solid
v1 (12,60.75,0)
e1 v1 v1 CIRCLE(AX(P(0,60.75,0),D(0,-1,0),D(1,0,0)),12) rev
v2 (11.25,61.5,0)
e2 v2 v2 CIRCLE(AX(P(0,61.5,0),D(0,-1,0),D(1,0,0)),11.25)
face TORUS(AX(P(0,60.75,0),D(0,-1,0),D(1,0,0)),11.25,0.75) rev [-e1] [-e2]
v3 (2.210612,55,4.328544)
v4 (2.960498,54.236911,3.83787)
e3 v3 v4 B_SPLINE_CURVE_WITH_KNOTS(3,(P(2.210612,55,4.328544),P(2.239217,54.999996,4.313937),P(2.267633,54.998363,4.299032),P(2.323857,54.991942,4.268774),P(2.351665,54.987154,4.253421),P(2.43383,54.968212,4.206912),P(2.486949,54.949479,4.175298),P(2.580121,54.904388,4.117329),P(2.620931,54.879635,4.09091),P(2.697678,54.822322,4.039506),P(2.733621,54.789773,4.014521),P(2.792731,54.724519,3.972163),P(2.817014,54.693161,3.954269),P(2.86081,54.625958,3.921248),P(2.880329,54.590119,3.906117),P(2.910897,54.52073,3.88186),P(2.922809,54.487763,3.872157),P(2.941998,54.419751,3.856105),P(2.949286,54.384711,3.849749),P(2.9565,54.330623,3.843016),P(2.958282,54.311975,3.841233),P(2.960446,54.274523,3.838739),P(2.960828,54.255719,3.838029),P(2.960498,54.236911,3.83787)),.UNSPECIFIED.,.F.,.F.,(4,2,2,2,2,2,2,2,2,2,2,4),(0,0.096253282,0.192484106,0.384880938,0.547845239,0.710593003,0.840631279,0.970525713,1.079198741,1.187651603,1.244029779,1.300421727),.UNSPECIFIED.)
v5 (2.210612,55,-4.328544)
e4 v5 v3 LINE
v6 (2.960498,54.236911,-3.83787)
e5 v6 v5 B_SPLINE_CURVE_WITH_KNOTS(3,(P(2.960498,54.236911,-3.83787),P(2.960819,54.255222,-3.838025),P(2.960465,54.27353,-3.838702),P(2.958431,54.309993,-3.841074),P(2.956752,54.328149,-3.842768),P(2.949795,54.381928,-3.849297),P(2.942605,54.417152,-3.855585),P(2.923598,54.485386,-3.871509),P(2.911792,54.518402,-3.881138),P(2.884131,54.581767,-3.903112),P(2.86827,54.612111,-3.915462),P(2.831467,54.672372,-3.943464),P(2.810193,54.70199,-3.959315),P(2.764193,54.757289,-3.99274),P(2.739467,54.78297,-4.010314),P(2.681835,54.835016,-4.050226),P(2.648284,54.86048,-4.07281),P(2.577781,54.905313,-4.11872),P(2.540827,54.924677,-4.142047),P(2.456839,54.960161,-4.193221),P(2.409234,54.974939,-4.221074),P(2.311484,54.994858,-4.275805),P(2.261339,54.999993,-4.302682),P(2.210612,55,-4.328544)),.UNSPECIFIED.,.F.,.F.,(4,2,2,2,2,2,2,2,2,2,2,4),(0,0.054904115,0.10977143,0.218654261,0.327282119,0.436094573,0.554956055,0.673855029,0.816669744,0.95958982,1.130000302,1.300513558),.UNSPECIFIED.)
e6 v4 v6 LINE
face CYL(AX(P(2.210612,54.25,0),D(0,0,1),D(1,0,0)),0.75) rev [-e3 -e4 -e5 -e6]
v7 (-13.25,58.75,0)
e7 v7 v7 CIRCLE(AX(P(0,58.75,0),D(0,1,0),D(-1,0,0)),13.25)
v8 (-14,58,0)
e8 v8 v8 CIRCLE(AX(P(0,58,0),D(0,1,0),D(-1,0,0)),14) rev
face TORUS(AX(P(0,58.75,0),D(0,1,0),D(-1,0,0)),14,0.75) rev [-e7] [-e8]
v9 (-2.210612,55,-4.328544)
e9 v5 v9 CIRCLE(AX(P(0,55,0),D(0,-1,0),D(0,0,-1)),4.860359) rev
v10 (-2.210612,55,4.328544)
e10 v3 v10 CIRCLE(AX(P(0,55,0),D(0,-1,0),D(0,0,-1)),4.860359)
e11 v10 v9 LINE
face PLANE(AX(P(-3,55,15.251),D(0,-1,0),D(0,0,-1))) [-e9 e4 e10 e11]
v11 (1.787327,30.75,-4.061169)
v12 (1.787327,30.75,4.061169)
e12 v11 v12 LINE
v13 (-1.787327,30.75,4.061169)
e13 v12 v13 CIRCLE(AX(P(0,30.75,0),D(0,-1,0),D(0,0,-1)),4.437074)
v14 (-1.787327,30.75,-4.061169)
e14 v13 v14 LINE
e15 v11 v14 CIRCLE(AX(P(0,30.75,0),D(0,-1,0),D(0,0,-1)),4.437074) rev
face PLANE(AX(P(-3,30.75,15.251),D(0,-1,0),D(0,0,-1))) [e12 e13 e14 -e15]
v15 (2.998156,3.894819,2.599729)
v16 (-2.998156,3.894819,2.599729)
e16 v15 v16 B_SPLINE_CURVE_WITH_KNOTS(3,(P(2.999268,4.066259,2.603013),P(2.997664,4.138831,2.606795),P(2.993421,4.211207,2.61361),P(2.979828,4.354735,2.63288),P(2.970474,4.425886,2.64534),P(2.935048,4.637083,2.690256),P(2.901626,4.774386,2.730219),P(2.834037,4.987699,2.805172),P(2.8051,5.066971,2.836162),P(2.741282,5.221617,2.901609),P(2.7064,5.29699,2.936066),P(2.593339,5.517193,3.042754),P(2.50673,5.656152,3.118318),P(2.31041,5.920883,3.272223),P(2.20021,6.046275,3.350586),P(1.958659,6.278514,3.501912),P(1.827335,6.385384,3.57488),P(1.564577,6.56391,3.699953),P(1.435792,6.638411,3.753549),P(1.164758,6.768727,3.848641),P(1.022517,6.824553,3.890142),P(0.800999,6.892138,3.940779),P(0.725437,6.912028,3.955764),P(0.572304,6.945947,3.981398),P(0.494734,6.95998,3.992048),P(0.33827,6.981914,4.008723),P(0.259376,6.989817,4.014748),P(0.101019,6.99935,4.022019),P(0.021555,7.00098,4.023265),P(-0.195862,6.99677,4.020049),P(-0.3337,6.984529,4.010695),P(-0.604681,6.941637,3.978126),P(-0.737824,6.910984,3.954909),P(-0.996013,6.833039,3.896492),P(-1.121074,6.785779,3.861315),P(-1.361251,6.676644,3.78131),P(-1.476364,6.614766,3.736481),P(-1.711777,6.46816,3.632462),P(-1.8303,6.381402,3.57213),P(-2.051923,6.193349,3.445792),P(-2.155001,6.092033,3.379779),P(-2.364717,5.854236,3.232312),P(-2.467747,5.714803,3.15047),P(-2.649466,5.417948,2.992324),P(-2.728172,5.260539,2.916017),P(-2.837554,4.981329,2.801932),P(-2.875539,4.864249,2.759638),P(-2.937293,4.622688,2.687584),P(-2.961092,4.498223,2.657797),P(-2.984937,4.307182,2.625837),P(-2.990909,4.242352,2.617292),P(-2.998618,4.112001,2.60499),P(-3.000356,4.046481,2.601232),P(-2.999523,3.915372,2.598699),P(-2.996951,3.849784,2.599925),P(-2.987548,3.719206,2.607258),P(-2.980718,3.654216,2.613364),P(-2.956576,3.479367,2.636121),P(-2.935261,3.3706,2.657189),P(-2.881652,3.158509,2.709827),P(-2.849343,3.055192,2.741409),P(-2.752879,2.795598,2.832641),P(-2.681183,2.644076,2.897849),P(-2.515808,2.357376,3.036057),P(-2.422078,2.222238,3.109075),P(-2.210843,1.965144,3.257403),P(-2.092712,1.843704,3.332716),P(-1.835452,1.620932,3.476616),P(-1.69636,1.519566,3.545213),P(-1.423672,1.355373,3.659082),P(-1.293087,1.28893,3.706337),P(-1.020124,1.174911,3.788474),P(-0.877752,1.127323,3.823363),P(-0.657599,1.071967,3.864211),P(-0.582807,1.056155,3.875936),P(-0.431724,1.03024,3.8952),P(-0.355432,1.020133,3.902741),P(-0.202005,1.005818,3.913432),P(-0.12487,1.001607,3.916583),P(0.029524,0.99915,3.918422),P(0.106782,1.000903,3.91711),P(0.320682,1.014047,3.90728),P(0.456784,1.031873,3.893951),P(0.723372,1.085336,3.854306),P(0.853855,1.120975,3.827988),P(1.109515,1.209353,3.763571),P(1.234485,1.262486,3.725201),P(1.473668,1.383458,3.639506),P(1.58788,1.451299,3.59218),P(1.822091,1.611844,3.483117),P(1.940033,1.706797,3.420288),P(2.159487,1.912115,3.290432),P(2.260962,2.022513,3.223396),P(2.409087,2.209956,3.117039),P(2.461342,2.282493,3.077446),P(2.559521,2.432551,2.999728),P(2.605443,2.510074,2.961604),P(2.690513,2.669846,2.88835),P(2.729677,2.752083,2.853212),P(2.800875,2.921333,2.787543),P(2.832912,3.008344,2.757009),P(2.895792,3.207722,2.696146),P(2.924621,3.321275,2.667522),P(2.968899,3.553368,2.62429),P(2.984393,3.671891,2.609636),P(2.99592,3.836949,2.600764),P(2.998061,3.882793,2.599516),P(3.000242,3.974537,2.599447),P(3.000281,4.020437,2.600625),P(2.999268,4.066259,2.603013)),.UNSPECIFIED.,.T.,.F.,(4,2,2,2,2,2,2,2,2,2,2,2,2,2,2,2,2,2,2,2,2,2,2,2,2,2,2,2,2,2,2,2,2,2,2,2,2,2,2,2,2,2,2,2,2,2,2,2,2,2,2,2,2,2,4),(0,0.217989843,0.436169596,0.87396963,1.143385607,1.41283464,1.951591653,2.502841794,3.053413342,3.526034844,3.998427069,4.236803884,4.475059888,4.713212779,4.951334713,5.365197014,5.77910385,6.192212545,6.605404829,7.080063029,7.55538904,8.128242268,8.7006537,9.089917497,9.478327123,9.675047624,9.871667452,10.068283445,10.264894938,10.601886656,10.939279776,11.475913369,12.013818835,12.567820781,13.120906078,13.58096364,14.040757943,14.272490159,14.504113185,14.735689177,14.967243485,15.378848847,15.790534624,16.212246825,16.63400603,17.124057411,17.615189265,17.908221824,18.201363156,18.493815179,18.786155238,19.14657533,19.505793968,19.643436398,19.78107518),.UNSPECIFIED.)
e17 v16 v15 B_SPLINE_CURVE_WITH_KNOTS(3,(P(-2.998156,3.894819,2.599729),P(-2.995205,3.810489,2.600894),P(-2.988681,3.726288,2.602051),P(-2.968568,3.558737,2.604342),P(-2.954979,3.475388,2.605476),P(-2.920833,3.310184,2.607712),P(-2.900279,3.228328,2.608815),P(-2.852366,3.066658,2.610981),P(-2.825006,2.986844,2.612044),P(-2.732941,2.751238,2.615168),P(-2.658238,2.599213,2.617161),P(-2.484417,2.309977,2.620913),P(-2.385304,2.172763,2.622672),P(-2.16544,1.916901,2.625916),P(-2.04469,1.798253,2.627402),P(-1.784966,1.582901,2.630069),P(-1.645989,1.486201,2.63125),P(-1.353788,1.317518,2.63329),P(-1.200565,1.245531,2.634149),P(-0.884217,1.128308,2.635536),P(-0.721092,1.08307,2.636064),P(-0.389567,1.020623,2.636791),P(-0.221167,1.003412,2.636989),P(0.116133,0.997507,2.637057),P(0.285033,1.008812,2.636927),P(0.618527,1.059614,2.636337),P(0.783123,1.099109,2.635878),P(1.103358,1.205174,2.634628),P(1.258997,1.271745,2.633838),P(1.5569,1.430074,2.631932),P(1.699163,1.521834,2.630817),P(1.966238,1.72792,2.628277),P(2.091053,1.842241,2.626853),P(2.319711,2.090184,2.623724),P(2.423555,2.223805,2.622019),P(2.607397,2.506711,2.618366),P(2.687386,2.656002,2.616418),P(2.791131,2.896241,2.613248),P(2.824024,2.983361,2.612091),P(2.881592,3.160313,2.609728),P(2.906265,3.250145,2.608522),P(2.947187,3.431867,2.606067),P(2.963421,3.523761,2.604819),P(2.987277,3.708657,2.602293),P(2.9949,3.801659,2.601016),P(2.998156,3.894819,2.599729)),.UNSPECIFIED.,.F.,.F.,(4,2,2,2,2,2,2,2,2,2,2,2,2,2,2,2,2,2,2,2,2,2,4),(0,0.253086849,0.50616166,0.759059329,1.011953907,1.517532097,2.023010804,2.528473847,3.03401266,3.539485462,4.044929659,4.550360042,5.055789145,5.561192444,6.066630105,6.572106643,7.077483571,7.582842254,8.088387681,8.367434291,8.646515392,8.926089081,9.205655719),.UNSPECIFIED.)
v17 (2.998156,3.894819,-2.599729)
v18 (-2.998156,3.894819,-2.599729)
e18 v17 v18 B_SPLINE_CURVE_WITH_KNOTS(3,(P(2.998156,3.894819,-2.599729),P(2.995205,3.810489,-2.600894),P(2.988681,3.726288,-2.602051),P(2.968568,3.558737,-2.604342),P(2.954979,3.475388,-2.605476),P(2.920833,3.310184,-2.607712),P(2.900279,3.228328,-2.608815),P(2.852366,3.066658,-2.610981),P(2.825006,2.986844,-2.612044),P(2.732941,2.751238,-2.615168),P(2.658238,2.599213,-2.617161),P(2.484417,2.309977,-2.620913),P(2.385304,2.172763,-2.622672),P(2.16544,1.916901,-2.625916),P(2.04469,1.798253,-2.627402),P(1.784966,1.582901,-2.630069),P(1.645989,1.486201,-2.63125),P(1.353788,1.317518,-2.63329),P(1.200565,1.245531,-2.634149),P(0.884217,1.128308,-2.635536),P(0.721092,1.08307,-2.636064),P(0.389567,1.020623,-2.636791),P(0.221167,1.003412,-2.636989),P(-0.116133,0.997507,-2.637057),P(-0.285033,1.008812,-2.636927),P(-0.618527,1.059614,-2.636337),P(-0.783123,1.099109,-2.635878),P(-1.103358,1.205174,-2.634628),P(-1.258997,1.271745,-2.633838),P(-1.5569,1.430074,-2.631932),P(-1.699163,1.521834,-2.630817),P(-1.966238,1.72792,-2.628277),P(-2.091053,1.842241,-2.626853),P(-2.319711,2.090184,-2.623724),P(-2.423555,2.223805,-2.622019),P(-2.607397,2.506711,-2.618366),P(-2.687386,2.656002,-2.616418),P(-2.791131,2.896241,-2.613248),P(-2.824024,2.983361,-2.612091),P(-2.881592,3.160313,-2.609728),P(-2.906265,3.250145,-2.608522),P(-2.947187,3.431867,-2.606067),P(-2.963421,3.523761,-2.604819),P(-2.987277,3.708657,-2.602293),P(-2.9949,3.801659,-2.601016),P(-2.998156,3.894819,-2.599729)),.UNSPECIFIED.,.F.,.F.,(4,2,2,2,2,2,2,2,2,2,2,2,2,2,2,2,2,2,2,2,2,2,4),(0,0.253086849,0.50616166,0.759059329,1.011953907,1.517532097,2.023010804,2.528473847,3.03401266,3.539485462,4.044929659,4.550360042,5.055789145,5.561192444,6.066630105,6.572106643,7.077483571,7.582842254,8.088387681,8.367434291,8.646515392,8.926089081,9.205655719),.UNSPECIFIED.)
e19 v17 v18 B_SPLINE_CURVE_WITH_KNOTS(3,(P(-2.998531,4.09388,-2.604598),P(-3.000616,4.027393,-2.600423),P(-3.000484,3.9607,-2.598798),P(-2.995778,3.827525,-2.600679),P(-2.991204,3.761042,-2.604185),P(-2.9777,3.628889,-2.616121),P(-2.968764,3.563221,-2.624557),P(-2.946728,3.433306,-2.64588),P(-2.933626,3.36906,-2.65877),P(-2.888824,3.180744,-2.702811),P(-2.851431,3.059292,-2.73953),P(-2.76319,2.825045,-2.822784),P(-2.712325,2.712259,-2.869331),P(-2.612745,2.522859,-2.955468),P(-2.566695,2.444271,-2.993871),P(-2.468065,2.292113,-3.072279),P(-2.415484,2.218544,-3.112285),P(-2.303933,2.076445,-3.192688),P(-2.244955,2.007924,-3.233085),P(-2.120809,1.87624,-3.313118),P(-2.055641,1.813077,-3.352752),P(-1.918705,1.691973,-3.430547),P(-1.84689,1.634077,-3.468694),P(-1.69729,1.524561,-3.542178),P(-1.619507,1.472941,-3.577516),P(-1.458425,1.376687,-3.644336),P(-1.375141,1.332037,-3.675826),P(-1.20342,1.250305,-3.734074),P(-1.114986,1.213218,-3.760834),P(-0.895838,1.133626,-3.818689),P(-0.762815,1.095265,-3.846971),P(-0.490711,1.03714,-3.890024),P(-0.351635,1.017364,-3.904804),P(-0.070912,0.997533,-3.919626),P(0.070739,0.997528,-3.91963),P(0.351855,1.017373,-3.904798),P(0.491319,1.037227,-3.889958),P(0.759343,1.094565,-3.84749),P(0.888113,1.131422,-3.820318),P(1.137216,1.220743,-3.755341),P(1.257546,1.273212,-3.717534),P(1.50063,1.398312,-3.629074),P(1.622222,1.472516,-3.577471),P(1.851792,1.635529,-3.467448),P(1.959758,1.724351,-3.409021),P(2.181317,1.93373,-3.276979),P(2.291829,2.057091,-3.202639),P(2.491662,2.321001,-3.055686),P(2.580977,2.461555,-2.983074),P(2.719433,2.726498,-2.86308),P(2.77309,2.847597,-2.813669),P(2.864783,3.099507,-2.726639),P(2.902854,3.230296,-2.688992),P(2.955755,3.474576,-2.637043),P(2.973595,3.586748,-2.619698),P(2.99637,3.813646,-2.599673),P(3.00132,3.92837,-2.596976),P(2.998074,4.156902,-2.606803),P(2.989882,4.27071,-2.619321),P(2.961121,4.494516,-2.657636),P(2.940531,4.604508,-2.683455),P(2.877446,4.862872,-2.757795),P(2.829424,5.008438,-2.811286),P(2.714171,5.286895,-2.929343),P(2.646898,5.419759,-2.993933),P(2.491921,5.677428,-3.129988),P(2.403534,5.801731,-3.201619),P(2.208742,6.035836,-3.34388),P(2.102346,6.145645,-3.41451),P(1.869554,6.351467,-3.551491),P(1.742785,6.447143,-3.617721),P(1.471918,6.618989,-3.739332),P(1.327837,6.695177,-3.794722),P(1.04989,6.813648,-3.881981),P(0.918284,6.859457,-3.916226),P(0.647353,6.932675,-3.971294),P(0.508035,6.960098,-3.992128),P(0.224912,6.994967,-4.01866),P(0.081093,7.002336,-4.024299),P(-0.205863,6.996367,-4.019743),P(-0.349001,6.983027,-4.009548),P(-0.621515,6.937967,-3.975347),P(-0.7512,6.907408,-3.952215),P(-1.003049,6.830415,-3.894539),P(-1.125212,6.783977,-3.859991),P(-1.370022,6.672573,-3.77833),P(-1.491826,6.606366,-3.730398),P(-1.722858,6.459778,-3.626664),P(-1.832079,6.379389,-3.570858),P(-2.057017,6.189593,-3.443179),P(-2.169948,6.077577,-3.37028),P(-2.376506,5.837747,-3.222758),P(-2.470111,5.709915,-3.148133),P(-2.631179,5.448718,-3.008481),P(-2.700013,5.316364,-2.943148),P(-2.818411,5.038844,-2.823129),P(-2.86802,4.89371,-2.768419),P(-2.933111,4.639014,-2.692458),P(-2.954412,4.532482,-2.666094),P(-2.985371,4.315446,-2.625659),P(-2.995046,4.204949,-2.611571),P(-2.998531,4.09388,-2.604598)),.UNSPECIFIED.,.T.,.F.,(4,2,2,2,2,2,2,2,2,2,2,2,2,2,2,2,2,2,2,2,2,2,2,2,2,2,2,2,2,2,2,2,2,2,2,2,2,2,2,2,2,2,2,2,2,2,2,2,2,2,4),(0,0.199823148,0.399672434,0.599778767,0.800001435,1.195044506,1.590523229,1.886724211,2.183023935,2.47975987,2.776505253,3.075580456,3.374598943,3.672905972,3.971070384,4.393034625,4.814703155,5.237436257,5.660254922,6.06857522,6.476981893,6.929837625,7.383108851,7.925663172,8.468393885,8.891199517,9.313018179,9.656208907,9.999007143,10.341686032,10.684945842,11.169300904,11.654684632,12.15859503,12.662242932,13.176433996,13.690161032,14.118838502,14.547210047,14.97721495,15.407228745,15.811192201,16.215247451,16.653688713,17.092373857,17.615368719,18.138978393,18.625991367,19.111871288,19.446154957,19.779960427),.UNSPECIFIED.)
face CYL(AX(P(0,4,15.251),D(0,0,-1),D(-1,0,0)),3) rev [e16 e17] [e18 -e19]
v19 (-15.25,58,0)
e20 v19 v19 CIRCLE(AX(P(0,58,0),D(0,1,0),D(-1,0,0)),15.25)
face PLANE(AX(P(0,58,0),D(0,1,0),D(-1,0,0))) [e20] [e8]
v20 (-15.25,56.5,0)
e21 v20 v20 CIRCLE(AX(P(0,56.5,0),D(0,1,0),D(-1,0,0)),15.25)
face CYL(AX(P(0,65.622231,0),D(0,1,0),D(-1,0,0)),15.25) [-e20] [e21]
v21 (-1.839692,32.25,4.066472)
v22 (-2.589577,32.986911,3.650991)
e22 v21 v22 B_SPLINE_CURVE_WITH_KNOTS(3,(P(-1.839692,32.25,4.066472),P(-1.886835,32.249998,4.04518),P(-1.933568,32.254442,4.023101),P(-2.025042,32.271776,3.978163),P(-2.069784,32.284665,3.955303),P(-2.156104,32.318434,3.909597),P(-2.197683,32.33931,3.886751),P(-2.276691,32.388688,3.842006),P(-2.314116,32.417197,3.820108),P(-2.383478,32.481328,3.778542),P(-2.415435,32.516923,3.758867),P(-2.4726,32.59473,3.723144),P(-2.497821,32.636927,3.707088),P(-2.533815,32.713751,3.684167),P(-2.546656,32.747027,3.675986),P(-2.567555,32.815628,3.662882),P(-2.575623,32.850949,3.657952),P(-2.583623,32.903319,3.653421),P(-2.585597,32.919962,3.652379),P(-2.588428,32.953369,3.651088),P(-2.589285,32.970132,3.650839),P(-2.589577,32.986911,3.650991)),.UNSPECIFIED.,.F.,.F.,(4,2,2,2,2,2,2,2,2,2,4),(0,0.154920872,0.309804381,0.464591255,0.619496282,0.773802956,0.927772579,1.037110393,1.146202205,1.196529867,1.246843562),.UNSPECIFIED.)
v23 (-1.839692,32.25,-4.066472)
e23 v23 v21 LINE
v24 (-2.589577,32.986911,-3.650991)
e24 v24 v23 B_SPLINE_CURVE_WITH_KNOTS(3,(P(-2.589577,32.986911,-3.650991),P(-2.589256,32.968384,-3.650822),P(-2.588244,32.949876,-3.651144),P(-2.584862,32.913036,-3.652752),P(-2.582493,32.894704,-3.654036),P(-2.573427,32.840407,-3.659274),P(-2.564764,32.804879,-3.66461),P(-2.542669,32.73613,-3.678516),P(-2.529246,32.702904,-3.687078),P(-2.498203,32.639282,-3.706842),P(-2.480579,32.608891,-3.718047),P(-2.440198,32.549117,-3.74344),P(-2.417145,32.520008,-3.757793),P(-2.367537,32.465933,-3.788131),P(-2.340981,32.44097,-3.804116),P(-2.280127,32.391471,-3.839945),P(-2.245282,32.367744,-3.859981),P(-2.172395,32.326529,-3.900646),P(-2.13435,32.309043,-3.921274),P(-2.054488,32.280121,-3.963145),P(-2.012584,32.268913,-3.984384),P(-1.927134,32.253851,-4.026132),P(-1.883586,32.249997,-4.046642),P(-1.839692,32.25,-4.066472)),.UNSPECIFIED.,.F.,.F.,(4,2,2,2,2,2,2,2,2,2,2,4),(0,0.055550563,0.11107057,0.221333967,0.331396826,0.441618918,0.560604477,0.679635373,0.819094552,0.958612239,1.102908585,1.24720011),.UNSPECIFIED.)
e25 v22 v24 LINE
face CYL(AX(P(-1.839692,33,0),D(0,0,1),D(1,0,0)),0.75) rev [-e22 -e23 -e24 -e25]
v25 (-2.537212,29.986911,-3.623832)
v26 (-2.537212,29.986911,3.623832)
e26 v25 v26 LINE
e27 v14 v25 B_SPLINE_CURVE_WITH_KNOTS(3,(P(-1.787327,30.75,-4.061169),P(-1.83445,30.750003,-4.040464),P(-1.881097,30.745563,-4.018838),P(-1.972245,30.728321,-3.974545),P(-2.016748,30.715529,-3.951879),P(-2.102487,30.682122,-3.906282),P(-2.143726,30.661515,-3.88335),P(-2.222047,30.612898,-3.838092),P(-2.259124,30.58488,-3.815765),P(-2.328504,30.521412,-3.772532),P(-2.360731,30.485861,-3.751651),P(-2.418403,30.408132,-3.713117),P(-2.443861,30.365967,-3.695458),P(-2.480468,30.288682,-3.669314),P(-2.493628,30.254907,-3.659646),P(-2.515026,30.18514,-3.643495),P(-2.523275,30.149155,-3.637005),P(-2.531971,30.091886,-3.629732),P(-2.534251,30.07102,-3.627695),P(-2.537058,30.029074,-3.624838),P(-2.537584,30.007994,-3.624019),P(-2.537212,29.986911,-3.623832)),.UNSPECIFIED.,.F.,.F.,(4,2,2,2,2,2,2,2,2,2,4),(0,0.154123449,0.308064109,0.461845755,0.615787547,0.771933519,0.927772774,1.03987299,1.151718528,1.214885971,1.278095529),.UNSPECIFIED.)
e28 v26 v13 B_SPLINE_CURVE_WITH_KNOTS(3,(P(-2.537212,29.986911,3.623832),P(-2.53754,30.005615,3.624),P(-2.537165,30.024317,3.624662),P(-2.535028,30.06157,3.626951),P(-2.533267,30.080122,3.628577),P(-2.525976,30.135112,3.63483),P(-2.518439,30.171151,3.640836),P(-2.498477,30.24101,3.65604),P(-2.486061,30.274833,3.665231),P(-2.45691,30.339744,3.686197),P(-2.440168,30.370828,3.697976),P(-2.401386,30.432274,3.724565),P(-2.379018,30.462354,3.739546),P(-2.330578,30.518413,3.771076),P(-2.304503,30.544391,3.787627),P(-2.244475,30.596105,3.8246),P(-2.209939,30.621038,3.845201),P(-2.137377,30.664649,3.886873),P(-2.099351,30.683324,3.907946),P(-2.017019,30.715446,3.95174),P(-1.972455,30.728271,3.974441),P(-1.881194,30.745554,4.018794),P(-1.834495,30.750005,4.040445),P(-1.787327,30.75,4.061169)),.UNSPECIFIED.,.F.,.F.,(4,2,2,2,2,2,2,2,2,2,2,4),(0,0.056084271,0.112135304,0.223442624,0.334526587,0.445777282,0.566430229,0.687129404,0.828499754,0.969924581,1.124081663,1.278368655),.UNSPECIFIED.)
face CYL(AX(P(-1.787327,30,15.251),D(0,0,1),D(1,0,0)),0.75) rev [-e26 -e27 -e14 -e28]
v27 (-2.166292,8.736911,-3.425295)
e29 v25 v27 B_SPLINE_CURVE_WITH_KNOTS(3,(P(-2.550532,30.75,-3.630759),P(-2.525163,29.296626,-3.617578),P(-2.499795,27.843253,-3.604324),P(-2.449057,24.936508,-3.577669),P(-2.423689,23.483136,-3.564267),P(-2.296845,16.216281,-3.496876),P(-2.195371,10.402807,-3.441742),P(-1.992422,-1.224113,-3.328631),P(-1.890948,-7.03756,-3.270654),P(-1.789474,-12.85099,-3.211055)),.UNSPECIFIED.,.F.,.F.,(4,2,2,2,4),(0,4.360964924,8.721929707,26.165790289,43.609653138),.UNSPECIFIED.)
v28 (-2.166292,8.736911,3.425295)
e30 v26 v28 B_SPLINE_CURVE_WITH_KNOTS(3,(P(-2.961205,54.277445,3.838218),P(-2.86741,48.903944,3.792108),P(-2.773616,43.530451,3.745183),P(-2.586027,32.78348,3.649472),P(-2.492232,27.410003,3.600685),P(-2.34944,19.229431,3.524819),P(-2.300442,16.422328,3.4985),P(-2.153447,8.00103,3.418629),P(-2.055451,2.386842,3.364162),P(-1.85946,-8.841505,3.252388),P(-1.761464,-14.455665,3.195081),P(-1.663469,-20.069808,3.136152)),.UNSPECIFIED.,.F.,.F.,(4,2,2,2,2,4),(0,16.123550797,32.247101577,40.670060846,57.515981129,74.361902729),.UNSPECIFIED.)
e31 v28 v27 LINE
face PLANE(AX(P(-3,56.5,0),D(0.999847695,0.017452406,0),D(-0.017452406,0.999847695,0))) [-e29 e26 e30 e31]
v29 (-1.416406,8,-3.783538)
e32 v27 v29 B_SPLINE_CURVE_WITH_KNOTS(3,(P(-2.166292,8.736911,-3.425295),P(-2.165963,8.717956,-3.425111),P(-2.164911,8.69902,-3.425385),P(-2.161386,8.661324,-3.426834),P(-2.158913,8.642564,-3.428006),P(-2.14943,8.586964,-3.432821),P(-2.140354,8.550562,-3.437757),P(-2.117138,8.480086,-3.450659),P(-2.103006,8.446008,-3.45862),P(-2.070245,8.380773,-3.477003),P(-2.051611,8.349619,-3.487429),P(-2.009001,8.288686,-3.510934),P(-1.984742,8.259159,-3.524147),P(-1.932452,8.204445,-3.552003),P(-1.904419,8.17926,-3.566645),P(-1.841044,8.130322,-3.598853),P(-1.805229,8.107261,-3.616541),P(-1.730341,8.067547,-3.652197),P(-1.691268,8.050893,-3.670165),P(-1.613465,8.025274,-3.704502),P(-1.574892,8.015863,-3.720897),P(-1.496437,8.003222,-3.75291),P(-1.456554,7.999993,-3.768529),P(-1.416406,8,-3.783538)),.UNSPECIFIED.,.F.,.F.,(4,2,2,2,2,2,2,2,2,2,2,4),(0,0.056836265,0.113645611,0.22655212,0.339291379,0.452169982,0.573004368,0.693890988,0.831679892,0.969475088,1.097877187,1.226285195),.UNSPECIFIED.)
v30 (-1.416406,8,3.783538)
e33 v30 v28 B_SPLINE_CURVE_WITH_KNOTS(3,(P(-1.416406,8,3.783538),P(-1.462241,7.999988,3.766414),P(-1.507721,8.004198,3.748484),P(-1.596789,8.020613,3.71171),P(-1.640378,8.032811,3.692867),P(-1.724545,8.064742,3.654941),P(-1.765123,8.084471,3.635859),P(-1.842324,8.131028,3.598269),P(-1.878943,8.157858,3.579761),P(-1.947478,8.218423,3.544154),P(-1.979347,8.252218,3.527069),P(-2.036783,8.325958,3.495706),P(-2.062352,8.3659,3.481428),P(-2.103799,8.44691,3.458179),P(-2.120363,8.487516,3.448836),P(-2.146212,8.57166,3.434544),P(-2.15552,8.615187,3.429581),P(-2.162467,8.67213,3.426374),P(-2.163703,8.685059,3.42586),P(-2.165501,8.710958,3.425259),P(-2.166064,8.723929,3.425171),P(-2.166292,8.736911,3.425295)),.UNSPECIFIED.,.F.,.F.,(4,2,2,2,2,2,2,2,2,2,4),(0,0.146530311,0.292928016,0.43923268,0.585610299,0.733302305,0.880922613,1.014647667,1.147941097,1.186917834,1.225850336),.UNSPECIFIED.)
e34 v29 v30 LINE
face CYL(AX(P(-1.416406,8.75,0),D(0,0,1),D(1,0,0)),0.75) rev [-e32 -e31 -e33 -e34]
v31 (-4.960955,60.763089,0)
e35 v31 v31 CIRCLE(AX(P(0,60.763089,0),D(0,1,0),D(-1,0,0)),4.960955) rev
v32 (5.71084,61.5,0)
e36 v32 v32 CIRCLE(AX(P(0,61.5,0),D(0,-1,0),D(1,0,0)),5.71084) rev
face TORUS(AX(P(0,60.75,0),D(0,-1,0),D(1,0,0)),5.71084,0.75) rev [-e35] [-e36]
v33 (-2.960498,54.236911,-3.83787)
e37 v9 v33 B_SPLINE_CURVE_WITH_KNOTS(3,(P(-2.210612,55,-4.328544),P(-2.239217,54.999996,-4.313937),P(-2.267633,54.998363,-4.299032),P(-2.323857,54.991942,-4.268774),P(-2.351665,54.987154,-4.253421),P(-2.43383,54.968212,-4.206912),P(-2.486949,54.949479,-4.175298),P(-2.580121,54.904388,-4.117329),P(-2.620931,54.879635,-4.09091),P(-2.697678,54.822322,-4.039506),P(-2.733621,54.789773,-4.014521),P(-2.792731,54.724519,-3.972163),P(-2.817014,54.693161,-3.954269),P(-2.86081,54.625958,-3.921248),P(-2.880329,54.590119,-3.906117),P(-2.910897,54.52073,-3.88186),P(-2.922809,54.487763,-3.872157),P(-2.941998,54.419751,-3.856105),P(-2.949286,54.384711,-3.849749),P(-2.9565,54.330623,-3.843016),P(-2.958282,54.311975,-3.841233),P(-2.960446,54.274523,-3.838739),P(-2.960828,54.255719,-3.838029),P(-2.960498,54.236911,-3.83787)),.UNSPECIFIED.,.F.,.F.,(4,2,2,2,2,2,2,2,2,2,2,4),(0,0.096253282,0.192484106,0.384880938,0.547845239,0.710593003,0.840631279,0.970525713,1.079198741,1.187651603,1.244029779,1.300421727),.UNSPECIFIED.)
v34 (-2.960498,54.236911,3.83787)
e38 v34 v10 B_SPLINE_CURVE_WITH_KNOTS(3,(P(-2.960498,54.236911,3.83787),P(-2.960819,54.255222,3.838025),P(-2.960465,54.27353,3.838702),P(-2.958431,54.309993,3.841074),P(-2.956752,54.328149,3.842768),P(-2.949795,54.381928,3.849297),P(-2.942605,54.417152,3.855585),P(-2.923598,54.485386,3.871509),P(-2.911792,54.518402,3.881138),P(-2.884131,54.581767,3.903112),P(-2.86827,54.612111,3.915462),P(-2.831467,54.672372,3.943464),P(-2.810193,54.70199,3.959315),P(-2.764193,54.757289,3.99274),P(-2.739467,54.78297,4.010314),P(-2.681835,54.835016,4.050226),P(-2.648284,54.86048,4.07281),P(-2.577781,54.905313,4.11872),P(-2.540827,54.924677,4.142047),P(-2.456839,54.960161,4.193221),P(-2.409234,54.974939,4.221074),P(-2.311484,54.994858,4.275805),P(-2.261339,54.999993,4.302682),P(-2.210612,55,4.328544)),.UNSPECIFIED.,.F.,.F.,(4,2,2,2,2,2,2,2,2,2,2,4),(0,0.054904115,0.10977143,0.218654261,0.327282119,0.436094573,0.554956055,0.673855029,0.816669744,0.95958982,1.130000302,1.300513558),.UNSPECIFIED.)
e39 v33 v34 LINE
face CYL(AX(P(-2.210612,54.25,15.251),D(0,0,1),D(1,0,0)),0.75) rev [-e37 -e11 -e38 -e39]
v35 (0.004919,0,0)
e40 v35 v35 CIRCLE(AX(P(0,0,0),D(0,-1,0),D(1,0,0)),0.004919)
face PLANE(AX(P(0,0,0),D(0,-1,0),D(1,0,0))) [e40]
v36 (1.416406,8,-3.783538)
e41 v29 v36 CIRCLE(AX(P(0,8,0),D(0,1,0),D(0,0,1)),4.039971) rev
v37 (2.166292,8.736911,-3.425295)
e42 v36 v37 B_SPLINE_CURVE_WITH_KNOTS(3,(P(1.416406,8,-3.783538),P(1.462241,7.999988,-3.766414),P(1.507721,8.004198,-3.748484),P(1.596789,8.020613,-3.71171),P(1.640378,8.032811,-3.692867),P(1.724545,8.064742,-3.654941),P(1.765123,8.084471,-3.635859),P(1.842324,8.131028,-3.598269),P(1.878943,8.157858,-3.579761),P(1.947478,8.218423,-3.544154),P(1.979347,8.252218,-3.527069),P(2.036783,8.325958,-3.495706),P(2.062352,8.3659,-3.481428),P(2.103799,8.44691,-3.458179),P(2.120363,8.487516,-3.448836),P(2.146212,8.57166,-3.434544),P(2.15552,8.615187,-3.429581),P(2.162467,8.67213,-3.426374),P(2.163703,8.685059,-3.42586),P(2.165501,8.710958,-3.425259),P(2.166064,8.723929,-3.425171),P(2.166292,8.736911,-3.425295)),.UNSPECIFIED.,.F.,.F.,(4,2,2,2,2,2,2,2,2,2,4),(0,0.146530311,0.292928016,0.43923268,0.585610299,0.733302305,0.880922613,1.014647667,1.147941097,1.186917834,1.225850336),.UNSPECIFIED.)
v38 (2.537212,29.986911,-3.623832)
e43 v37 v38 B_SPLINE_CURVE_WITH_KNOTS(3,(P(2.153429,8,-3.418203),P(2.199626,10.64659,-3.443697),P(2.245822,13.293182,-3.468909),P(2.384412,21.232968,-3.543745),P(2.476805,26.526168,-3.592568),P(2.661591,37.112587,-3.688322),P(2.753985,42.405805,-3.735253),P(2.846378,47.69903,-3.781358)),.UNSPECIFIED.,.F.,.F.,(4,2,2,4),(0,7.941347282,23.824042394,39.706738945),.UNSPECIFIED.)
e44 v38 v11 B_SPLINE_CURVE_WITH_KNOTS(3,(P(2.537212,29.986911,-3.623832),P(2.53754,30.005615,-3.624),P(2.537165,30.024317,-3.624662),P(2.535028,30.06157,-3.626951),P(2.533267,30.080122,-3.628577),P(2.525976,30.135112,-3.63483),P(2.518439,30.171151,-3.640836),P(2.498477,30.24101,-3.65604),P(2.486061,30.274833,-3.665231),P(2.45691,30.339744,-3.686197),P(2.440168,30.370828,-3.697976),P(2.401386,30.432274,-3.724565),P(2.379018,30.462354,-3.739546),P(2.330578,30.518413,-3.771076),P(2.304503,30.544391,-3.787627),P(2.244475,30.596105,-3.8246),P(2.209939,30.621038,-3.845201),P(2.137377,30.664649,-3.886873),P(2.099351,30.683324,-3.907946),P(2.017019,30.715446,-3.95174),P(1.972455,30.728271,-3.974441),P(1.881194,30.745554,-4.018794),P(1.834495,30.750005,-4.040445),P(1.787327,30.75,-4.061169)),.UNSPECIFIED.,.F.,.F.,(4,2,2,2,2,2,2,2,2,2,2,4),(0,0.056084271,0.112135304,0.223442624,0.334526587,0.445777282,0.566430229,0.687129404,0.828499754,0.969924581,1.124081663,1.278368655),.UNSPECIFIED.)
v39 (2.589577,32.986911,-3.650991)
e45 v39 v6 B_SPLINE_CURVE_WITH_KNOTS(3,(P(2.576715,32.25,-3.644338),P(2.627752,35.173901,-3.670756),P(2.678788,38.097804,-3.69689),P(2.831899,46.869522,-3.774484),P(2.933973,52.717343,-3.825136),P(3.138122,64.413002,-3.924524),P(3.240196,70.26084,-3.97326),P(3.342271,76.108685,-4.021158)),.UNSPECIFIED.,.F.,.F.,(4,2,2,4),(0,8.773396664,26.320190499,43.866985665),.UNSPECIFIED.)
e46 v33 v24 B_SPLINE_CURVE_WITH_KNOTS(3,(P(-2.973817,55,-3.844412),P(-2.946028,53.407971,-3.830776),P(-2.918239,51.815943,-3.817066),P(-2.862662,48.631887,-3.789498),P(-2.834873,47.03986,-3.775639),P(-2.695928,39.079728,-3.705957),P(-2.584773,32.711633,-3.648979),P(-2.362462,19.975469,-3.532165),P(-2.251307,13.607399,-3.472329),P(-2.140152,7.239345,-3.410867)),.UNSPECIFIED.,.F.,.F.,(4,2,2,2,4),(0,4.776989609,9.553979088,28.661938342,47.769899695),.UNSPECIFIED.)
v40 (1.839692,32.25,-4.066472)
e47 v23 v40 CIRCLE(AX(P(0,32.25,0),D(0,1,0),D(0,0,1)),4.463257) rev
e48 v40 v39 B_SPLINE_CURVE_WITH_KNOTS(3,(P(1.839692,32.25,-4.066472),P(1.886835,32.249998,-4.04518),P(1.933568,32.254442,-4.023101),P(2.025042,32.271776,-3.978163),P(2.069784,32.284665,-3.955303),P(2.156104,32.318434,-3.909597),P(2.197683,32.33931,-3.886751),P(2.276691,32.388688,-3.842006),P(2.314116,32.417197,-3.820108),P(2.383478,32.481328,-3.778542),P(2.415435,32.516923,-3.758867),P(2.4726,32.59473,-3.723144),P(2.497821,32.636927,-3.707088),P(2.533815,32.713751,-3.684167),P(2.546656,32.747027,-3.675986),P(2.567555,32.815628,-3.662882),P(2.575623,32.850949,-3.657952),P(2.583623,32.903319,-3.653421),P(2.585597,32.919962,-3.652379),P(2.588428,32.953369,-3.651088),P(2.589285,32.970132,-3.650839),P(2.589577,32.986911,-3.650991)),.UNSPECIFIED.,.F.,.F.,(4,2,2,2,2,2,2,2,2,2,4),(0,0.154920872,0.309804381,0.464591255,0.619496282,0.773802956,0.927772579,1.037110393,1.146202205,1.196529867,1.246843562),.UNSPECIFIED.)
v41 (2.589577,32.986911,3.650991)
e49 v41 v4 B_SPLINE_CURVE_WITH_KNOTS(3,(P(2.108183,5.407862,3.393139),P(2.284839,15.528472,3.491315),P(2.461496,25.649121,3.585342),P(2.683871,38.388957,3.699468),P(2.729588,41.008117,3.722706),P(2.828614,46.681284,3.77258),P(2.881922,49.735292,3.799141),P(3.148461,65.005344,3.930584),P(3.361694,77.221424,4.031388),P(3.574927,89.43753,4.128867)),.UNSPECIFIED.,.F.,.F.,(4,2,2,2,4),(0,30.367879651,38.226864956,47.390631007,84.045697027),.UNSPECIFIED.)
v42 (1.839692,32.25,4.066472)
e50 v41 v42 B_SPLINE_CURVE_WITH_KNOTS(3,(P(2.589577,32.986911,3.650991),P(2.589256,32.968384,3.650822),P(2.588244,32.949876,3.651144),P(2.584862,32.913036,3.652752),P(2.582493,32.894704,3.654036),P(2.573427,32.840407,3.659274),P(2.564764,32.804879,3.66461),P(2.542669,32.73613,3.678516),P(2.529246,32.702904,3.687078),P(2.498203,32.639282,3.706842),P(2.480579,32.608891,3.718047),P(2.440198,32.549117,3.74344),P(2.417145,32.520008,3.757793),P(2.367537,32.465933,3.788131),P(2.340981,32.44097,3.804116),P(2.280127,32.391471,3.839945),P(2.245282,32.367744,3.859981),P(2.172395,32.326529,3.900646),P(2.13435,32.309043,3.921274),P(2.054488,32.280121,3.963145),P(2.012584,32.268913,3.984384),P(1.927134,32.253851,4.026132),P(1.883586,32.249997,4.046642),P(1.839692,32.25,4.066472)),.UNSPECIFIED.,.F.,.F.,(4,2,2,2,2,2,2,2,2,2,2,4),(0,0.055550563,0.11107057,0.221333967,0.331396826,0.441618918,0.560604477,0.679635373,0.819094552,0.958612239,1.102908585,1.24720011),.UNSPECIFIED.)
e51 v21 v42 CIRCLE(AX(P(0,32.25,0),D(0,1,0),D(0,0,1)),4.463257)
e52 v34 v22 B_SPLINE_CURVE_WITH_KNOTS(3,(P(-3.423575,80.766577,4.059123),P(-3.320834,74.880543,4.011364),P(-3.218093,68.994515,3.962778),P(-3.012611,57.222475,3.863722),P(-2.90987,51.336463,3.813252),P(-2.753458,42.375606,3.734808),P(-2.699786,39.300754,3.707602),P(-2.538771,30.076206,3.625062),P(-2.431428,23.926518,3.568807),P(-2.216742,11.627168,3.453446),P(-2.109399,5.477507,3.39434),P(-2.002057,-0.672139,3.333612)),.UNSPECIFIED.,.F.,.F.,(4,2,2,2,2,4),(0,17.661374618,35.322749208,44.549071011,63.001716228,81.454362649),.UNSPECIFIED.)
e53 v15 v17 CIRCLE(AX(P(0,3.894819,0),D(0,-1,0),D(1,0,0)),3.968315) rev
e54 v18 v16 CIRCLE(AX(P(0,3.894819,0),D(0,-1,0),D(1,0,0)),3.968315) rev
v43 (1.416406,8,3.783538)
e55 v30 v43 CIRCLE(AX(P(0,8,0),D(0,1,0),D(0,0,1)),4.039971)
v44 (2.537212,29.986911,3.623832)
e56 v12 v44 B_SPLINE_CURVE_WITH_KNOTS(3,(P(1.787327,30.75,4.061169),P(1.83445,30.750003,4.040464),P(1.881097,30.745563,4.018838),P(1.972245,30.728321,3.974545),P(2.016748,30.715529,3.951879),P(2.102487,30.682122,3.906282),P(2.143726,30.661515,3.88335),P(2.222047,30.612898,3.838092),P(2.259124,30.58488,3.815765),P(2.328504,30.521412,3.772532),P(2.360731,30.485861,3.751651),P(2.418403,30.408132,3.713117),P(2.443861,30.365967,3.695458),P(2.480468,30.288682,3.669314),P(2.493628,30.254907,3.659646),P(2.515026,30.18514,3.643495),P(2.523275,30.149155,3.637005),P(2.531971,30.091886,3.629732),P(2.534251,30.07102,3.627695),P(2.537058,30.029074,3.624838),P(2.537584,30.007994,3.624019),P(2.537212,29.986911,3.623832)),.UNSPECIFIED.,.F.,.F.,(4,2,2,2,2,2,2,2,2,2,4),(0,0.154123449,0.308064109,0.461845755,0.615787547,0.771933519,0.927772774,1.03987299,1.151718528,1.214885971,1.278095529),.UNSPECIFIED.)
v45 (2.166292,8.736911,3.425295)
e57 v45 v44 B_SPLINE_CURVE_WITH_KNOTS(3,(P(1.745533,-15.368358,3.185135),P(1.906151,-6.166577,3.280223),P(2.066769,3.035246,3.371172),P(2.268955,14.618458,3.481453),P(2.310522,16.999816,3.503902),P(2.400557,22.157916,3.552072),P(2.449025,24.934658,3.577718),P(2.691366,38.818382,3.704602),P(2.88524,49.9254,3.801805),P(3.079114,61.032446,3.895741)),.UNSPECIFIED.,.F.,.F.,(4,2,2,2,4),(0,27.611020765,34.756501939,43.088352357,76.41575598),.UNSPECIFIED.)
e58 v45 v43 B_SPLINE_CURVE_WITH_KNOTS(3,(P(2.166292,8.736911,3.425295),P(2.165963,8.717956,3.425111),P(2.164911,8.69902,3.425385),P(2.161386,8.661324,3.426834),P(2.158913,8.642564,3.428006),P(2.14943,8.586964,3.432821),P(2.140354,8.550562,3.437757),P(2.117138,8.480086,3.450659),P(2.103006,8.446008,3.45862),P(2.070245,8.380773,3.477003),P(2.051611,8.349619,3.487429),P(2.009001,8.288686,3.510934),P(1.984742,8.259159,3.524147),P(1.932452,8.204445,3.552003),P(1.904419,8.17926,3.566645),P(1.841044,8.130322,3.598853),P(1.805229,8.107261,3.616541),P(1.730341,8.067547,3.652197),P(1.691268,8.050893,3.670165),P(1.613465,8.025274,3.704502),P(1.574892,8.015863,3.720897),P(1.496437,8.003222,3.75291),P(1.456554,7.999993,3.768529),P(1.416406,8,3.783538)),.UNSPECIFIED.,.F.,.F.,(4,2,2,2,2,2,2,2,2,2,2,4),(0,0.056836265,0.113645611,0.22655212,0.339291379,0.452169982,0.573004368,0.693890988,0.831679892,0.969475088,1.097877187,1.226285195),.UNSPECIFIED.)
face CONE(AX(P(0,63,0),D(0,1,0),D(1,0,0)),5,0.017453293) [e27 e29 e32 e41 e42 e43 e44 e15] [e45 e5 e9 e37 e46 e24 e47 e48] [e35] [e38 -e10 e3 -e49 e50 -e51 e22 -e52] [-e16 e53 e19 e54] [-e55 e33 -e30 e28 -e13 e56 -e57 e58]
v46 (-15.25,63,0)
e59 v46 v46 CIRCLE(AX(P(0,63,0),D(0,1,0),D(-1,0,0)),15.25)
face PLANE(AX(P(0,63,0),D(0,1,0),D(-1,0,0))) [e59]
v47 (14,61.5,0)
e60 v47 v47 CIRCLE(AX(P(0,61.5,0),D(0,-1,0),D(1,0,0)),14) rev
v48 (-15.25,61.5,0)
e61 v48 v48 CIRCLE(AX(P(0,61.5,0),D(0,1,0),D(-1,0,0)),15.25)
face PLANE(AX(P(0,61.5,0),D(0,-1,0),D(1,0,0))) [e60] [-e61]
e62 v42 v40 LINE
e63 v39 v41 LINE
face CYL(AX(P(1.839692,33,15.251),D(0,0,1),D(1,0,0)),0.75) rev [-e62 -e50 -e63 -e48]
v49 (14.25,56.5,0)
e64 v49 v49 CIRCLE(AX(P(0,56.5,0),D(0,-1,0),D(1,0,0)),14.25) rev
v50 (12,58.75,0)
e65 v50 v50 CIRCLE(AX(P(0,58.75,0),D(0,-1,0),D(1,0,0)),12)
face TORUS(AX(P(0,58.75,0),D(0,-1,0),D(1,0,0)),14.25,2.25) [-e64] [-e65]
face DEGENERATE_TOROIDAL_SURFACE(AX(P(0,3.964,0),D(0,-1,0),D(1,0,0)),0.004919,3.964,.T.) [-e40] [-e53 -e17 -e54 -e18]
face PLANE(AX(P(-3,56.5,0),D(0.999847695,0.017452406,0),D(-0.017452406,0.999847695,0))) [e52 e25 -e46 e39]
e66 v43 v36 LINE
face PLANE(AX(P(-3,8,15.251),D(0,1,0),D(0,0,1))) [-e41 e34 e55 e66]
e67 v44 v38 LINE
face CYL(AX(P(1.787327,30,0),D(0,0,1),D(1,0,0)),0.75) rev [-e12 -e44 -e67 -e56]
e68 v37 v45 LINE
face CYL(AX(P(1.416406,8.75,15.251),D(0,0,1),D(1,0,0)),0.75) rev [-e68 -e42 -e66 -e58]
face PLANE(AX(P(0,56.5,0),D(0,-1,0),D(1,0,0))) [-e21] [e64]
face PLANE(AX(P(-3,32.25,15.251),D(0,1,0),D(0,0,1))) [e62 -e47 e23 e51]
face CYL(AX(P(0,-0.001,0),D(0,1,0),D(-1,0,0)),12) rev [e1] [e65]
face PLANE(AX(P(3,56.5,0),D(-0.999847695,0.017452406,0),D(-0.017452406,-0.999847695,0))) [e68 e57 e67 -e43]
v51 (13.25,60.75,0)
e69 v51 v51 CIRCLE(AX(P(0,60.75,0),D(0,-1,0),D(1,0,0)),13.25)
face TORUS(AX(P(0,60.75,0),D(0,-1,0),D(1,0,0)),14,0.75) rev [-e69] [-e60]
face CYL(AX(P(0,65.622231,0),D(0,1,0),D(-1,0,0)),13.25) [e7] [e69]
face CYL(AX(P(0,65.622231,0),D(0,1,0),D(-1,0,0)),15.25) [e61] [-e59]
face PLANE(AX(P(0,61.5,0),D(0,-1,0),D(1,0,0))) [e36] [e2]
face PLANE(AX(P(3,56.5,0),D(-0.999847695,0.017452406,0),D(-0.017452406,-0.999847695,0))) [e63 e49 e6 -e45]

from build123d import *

# Parameters (mm, degrees)
CUT_EXTRUDE1_REACH                  = 68.589
CUT_EXTRUDE1_END_RADIUS             = 5
SKETCH2_R                           = 3
SKETCH2_W                           = 6
SKETCH2_H                           = 22.75
CUT_EXTRUDE1_DIRECTION_2_REACH      = 68.589
CUT_EXTRUDE1_DIRECTION_2_END_RADIUS = 5
CUT_EXTRUDE2_REACH                  = 70.089
CUT_EXTRUDE2_START                  = 1.5
SKETCH3_R                           = 12
SKETCH3_R_2                         = 5
DRAFT5_ANGLE                        = -1
FILLET3_R                           = 0.75
FILLET5_R                           = 3.964
FILLET6_R                           = 2.25


# Read off the part's stored shape, not the designer's step: Draft4
with BuildPart() as part:
    # Sketch1 → Revolve4 (revolve)
    with BuildSketch(Plane.XY, mode=Mode.PRIVATE) as revolve4_sk:
        Polygon((0, 8), (0, 0), (5, 0), (5, 56.5), (15.25, 56.5), (15.25, 58), (13.25, 58), (13.25, 61.5), (15.25, 61.5), (15.25, 63), (0, 63), (0, 61.5), align=None)
    revolve(revolve4_sk.sketch.rotate(Axis((0, 65.622230863, 0), (0, -1, 0)), 180), axis=Axis((0, 65.622230863, 0), (0, -1, 0)))

    # Cut-Extrude1: up to this cylinder (the profile starts inside it)
    cut_extrude1_end = Plane(origin=(0, 23.8125, 0), z_dir=(0, 1, 0)) * Cylinder(CUT_EXTRUDE1_END_RADIUS, 187.803, mode=Mode.PRIVATE)
    # Sketch2 → Cut-Extrude1 (cut, up to the surface)
    with BuildSketch(Plane.XY, mode=Mode.PRIVATE) as cut_extrude1_sk1:
        with Locations(Location((0, 4, 0), (0, 0, 180))):
            Circle(SKETCH2_R)
    cut_extrude1_tool1 = extrude(cut_extrude1_sk1.sketch, amount=-CUT_EXTRUDE1_REACH, mode=Mode.PRIVATE) & cut_extrude1_end
    add(cut_extrude1_tool1.solids().sort_by_distance((0, 4, 0))[0], mode=Mode.SUBTRACT)
    # Sketch2 → Cut-Extrude1 (cut, up to the surface)
    with BuildSketch(Plane.XY, mode=Mode.PRIVATE) as cut_extrude1_sk2:
        with Locations((0, 43.625)):
            Rectangle(SKETCH2_W, SKETCH2_H)
    cut_extrude1_tool2 = extrude(cut_extrude1_sk2.sketch, amount=-CUT_EXTRUDE1_REACH, mode=Mode.PRIVATE) & cut_extrude1_end
    add(cut_extrude1_tool2.solids().sort_by_distance((0, 43.625, 0))[0], mode=Mode.SUBTRACT)
    # Sketch2 → Cut-Extrude1 (cut, up to the surface)
    with BuildSketch(Plane.XY, mode=Mode.PRIVATE) as cut_extrude1_sk3:
        with Locations((0, 19.375)):
            Rectangle(SKETCH2_W, SKETCH2_H)
    cut_extrude1_tool3 = extrude(cut_extrude1_sk3.sketch, amount=-CUT_EXTRUDE1_REACH, mode=Mode.PRIVATE) & cut_extrude1_end
    add(cut_extrude1_tool3.solids().sort_by_distance((0, 19.375, 0))[0], mode=Mode.SUBTRACT)

    # Cut-Extrude1 direction 2: up to this cylinder (the profile starts inside it)
    cut_extrude1_direction_2_end = Plane(origin=(0, 23.8125, 0), z_dir=(0, 1, 0)) * Cylinder(CUT_EXTRUDE1_DIRECTION_2_END_RADIUS, 187.803, mode=Mode.PRIVATE)
    # Sketch2 → Cut-Extrude1 direction 2 (cut, up to the surface)
    with BuildSketch(Plane.XY, mode=Mode.PRIVATE) as cut_extrude1_direction_2_sk1:
        with Locations(Location((0, 4, 0), (0, 0, 180))):
            Circle(SKETCH2_R)
    cut_extrude1_direction_2_tool1 = extrude(cut_extrude1_direction_2_sk1.sketch, amount=CUT_EXTRUDE1_DIRECTION_2_REACH, mode=Mode.PRIVATE) & cut_extrude1_direction_2_end
    add(cut_extrude1_direction_2_tool1.solids().sort_by_distance((0, 4, 0))[0], mode=Mode.SUBTRACT)
    # Sketch2 → Cut-Extrude1 direction 2 (cut, up to the surface)
    with BuildSketch(Plane.XY, mode=Mode.PRIVATE) as cut_extrude1_direction_2_sk2:
        with Locations((0, 43.625)):
            Rectangle(SKETCH2_W, SKETCH2_H)
    cut_extrude1_direction_2_tool2 = extrude(cut_extrude1_direction_2_sk2.sketch, amount=CUT_EXTRUDE1_DIRECTION_2_REACH, mode=Mode.PRIVATE) & cut_extrude1_direction_2_end
    add(cut_extrude1_direction_2_tool2.solids().sort_by_distance((0, 43.625, 0))[0], mode=Mode.SUBTRACT)
    # Sketch2 → Cut-Extrude1 direction 2 (cut, up to the surface)
    with BuildSketch(Plane.XY, mode=Mode.PRIVATE) as cut_extrude1_direction_2_sk3:
        with Locations((0, 19.375)):
            Rectangle(SKETCH2_W, SKETCH2_H)
    cut_extrude1_direction_2_tool3 = extrude(cut_extrude1_direction_2_sk3.sketch, amount=CUT_EXTRUDE1_DIRECTION_2_REACH, mode=Mode.PRIVATE) & cut_extrude1_direction_2_end
    add(cut_extrude1_direction_2_tool3.solids().sort_by_distance((0, 19.375, 0))[0], mode=Mode.SUBTRACT)

    # Sketch3 → Cut-Extrude2 (cut, up to next)
    with BuildSketch(Plane.XZ.offset(-63).offset(CUT_EXTRUDE2_START), mode=Mode.PRIVATE) as cut_extrude2_sk1:
        Circle(SKETCH3_R)
        with Locations(Location((0, 0, 0), (0, 0, 180))):
            Circle(SKETCH3_R_2, mode=Mode.SUBTRACT)
    cut_extrude2_tool1 = extrude(cut_extrude2_sk1.sketch, amount=CUT_EXTRUDE2_REACH, mode=Mode.PRIVATE) & part.part
    add(cut_extrude2_tool1.solids().sort_by_distance((-11.660589, 61.5, 0))[0], mode=Mode.SUBTRACT)

    # Draft4 outline → Draft4 (revolve, cut)
    with BuildSketch(Plane.XY):
        Polygon((4.973817403, 61.5), (3.90033091, 0), (5, 0), (5, 61.5), align=None)
    revolve(axis=Axis((0, 0, 0), (0, 1, 0)), mode=Mode.SUBTRACT)

    # Draft5
    draft5_faces = [part.faces().sort_by_distance(p)[0] for p in [
        (3, 19.731668668, 0),
        (-3, 19.731668672, 0),
        (3, 43.90092481, 0),
        (-3, 43.900924809, 0),
    ]]
    draft(draft5_faces, Plane(origin=(0, 56.5, 0), x_dir=(-1, 0, 0), z_dir=(0, -1, 0)), DRAFT5_ANGLE)

    # Fillet3
    fillet3_edges = [part.edges().sort_by_distance(p)[0] for p in [
        (13.25, 61.5, 0),
        (13.25, 58, 0),
        (2.576714675, 32.25, 0),
        (-2.576714675, 32.25, 0),
        (-2.973817403, 55, 0),
        (2.973817403, 55, 0),
        (2.550532078, 30.75, 0),
        (-2.550532078, 30.75, 0),
        (2.153429351, 8, 0),
        (-2.153429351, 8, 0),
        (-4.973817403, 61.5, 0),
        (-12, 61.5, 0),
    ]]
    fillet(fillet3_edges, radius=FILLET3_R)

    # Fillet5
    # the kernel refuses this fillet: 3.964 mm, written as the material it takes off along each edge
    with BuildSketch(Plane(origin=(0, 0, 0), x_dir=(1, 0, 0), z_dir=(0, 0, 1))) as fillet5_piece_1:
        with BuildLine():
            CenterArc((3.90033091 - FILLET5_R * 0.982697263117, FILLET5_R), FILLET5_R, 270, 89)
            Line((3.90033091 - FILLET5_R * 0.982697263117, 0), (3.90033091, 0))
            Line((3.90033091, 0), (3.90033091 + FILLET5_R * 0.0171504320394, FILLET5_R * 0.982547593564))
        make_face()
    revolve(axis=Axis((0, 0, 0), (0, 1, 0)), mode=Mode.SUBTRACT)

    # Fillet6
    fillet6_edges = [part.edges().sort_by_distance(p)[0] for p in [
        (-12, 56.5, 0),
    ]]
    fillet(fillet6_edges, radius=FILLET6_R)


solid = part.part
